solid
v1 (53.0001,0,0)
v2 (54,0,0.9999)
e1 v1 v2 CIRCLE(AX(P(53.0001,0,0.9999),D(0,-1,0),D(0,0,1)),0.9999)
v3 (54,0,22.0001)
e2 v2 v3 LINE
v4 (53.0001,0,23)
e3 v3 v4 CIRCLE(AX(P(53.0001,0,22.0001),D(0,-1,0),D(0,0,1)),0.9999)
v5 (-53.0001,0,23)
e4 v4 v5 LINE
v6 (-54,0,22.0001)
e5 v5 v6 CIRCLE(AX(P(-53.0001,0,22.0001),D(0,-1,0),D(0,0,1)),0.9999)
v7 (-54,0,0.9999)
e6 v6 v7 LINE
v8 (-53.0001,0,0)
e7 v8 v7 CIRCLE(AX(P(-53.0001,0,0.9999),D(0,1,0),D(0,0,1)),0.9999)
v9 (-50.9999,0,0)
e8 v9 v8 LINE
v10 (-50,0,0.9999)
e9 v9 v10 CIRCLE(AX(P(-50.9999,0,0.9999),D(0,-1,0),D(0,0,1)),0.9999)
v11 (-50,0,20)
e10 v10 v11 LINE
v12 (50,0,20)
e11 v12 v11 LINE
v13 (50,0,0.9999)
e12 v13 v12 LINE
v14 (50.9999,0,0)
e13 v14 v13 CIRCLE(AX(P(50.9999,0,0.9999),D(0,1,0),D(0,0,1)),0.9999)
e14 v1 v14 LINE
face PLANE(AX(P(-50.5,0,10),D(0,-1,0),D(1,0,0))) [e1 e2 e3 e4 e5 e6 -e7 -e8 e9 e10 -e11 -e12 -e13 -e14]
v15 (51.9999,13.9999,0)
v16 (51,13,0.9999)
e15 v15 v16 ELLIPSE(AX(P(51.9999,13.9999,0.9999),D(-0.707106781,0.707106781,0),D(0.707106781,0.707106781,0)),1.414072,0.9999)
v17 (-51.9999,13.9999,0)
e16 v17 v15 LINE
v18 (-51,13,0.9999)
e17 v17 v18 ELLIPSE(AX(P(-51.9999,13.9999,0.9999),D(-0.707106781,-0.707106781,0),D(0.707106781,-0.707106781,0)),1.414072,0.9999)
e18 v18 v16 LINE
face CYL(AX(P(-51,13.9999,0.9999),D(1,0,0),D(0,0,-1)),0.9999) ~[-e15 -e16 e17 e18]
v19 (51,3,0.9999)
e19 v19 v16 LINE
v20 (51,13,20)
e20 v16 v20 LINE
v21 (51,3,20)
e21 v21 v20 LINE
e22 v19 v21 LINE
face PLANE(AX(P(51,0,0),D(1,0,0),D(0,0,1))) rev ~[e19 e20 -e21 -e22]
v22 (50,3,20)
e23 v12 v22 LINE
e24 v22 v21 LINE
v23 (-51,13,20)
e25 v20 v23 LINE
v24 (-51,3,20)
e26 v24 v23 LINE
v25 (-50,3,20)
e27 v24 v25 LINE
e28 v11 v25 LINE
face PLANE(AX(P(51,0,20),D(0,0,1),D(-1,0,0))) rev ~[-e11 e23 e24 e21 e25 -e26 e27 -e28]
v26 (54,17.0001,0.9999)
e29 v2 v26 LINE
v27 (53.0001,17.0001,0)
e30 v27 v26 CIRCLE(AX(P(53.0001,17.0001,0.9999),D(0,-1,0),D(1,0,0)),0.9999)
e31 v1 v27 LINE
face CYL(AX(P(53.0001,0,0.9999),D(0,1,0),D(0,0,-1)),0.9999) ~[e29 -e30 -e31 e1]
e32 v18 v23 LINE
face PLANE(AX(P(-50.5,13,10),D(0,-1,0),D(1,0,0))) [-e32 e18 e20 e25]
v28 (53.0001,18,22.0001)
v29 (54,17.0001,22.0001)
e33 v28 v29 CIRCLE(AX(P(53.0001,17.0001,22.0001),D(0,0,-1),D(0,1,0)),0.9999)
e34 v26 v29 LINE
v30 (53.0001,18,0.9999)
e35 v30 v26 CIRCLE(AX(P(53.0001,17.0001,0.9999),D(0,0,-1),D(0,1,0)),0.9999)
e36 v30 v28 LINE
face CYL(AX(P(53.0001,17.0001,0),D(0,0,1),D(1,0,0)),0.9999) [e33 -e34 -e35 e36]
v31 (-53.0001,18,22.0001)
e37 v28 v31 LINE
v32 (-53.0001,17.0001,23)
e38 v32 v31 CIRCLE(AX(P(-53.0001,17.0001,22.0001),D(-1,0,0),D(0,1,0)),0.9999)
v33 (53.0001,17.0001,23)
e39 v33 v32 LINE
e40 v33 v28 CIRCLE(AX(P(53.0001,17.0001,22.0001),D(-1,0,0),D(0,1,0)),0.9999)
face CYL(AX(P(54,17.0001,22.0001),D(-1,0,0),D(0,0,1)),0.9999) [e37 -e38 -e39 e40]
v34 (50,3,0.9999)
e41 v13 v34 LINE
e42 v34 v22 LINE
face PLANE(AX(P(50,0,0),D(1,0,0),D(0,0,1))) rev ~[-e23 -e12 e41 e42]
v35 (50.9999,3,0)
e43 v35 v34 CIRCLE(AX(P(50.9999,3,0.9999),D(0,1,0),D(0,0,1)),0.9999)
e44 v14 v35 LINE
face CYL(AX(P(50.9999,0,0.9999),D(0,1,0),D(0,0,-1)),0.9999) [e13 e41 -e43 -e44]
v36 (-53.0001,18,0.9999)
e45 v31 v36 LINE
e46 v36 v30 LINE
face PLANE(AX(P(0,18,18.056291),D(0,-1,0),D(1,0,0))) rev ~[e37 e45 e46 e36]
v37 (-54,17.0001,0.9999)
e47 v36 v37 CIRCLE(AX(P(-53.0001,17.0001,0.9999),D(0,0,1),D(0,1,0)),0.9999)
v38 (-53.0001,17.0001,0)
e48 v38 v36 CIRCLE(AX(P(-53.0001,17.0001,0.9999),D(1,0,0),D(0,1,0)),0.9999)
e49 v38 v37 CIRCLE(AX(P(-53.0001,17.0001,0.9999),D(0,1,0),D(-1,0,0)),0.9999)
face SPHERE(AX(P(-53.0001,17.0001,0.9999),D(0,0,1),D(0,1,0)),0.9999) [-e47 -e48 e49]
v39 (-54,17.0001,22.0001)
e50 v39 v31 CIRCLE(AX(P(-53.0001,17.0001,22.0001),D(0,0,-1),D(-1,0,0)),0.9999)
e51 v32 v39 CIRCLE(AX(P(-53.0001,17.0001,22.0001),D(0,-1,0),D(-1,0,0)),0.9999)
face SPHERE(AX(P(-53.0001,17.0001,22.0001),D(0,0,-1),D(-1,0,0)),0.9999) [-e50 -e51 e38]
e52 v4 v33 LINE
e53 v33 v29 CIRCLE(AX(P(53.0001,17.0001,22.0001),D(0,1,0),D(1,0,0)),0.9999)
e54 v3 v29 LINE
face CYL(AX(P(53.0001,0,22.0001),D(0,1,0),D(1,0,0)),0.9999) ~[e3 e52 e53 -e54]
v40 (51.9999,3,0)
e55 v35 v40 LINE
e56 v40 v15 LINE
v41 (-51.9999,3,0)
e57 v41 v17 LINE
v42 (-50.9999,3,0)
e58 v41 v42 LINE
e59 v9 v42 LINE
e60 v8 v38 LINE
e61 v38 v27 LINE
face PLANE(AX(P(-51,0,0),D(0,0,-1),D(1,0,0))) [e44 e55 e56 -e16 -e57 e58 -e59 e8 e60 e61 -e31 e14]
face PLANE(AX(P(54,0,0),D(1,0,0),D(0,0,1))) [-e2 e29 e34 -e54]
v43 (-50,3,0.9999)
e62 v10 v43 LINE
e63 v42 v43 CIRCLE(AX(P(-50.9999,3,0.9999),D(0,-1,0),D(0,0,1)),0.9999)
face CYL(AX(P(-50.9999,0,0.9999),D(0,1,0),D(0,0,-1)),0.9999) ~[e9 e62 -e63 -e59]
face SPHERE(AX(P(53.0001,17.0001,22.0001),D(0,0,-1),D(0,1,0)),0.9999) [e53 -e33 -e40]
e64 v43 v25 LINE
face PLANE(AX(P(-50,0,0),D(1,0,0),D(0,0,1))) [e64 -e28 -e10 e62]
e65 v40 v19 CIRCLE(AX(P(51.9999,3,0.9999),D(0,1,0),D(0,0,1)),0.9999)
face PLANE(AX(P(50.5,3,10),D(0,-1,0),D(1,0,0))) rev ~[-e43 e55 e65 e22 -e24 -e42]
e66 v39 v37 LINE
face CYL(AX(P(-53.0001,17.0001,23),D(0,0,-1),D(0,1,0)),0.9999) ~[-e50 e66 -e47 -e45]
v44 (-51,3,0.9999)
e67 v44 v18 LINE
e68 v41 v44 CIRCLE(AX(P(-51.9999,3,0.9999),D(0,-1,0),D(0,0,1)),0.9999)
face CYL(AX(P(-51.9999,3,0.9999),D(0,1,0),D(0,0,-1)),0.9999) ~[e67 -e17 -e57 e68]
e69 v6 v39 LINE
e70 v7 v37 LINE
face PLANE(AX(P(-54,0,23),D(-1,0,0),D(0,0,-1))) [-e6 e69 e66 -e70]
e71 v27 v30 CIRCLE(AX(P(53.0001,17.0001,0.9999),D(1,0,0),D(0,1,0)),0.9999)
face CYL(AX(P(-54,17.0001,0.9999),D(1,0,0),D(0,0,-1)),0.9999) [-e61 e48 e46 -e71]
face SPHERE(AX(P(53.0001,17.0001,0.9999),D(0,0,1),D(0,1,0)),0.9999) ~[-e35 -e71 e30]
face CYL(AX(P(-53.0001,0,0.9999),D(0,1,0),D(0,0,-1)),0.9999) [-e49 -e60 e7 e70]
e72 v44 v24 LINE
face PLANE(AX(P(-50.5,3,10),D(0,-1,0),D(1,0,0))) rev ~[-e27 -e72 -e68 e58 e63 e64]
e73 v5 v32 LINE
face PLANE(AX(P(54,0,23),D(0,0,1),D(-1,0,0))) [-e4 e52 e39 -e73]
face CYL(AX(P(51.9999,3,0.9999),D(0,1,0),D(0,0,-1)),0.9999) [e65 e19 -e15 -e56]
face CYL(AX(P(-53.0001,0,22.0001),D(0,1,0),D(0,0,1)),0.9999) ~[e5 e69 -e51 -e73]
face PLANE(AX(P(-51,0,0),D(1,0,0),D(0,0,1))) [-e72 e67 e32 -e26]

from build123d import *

# Parameters (mm, degrees)
F0_W     = 1
F0_H     = 20
F0_W_2   = 100
F1_DEPTH = 18
F2_DEPTH = 13
F3_DEPTH = 3
F4_R     = 0.9999


# Not quite as in the source:
# - a fillet or chamfer is up to 0.001 mm smaller than in the source, because OpenCascade refuses the exact size


with BuildPart() as f1:
    # F0 (on Front) → F1 (new body)
    with BuildSketch(Plane.XZ):
        Polygon((51, 20), (51, 0), (54, 0), (54, 23), (-54, 23), (-54, 0), (-51, 0), (-51, 20), (-50, 20), (50, 20), align=None)
        with Locations((-50.5, 10)):
            Rectangle(F0_W, F0_H)
        with Locations((0, 10)):
            Rectangle(F0_W_2, F0_H)
        with Locations((50.5, 10)):
            Rectangle(F0_W, F0_H)
    extrude(amount=-F1_DEPTH)

    # F0 (on Front) → F2 (cut)
    with BuildSketch(Plane.XZ):
        with Locations((-50.5, 10)):
            Rectangle(F0_W, F0_H)
        with Locations((0, 10)):
            Rectangle(F0_W_2, F0_H)
        with Locations((50.5, 10)):
            Rectangle(F0_W, F0_H)
    extrude(amount=-F2_DEPTH, mode=Mode.SUBTRACT)

    # F0 (on Front) → F3 (join)
    with BuildSketch(Plane.XZ):
        with Locations((-50.5, 10)):
            Rectangle(F0_W, F0_H)
        with Locations((50.5, 10)):
            Rectangle(F0_W, F0_H)
    extrude(amount=-F3_DEPTH)

    # F4 (radius 1 in the source; OpenCascade refuses exactly that, so slightly less here)
    f4_edges = [f1.edges().sort_by_distance(p)[0] for p in [
        (-54, 18, 11.5),
        (54, 18, 11.5),
        (0, 18, 0),
        (54, 9, 0),
        (-54, 9, 0),
        (-54, 9, 23),
        (0, 18, 23),
        (54, 9, 23),
        (0, 13, 0),
        (51, 8, 0),
        (-51, 8, 0),
        (-50, 1.5, 0),
        (50, 1.5, 0),
    ]]
    fillet(f4_edges, radius=F4_R)


solid = f1.part
